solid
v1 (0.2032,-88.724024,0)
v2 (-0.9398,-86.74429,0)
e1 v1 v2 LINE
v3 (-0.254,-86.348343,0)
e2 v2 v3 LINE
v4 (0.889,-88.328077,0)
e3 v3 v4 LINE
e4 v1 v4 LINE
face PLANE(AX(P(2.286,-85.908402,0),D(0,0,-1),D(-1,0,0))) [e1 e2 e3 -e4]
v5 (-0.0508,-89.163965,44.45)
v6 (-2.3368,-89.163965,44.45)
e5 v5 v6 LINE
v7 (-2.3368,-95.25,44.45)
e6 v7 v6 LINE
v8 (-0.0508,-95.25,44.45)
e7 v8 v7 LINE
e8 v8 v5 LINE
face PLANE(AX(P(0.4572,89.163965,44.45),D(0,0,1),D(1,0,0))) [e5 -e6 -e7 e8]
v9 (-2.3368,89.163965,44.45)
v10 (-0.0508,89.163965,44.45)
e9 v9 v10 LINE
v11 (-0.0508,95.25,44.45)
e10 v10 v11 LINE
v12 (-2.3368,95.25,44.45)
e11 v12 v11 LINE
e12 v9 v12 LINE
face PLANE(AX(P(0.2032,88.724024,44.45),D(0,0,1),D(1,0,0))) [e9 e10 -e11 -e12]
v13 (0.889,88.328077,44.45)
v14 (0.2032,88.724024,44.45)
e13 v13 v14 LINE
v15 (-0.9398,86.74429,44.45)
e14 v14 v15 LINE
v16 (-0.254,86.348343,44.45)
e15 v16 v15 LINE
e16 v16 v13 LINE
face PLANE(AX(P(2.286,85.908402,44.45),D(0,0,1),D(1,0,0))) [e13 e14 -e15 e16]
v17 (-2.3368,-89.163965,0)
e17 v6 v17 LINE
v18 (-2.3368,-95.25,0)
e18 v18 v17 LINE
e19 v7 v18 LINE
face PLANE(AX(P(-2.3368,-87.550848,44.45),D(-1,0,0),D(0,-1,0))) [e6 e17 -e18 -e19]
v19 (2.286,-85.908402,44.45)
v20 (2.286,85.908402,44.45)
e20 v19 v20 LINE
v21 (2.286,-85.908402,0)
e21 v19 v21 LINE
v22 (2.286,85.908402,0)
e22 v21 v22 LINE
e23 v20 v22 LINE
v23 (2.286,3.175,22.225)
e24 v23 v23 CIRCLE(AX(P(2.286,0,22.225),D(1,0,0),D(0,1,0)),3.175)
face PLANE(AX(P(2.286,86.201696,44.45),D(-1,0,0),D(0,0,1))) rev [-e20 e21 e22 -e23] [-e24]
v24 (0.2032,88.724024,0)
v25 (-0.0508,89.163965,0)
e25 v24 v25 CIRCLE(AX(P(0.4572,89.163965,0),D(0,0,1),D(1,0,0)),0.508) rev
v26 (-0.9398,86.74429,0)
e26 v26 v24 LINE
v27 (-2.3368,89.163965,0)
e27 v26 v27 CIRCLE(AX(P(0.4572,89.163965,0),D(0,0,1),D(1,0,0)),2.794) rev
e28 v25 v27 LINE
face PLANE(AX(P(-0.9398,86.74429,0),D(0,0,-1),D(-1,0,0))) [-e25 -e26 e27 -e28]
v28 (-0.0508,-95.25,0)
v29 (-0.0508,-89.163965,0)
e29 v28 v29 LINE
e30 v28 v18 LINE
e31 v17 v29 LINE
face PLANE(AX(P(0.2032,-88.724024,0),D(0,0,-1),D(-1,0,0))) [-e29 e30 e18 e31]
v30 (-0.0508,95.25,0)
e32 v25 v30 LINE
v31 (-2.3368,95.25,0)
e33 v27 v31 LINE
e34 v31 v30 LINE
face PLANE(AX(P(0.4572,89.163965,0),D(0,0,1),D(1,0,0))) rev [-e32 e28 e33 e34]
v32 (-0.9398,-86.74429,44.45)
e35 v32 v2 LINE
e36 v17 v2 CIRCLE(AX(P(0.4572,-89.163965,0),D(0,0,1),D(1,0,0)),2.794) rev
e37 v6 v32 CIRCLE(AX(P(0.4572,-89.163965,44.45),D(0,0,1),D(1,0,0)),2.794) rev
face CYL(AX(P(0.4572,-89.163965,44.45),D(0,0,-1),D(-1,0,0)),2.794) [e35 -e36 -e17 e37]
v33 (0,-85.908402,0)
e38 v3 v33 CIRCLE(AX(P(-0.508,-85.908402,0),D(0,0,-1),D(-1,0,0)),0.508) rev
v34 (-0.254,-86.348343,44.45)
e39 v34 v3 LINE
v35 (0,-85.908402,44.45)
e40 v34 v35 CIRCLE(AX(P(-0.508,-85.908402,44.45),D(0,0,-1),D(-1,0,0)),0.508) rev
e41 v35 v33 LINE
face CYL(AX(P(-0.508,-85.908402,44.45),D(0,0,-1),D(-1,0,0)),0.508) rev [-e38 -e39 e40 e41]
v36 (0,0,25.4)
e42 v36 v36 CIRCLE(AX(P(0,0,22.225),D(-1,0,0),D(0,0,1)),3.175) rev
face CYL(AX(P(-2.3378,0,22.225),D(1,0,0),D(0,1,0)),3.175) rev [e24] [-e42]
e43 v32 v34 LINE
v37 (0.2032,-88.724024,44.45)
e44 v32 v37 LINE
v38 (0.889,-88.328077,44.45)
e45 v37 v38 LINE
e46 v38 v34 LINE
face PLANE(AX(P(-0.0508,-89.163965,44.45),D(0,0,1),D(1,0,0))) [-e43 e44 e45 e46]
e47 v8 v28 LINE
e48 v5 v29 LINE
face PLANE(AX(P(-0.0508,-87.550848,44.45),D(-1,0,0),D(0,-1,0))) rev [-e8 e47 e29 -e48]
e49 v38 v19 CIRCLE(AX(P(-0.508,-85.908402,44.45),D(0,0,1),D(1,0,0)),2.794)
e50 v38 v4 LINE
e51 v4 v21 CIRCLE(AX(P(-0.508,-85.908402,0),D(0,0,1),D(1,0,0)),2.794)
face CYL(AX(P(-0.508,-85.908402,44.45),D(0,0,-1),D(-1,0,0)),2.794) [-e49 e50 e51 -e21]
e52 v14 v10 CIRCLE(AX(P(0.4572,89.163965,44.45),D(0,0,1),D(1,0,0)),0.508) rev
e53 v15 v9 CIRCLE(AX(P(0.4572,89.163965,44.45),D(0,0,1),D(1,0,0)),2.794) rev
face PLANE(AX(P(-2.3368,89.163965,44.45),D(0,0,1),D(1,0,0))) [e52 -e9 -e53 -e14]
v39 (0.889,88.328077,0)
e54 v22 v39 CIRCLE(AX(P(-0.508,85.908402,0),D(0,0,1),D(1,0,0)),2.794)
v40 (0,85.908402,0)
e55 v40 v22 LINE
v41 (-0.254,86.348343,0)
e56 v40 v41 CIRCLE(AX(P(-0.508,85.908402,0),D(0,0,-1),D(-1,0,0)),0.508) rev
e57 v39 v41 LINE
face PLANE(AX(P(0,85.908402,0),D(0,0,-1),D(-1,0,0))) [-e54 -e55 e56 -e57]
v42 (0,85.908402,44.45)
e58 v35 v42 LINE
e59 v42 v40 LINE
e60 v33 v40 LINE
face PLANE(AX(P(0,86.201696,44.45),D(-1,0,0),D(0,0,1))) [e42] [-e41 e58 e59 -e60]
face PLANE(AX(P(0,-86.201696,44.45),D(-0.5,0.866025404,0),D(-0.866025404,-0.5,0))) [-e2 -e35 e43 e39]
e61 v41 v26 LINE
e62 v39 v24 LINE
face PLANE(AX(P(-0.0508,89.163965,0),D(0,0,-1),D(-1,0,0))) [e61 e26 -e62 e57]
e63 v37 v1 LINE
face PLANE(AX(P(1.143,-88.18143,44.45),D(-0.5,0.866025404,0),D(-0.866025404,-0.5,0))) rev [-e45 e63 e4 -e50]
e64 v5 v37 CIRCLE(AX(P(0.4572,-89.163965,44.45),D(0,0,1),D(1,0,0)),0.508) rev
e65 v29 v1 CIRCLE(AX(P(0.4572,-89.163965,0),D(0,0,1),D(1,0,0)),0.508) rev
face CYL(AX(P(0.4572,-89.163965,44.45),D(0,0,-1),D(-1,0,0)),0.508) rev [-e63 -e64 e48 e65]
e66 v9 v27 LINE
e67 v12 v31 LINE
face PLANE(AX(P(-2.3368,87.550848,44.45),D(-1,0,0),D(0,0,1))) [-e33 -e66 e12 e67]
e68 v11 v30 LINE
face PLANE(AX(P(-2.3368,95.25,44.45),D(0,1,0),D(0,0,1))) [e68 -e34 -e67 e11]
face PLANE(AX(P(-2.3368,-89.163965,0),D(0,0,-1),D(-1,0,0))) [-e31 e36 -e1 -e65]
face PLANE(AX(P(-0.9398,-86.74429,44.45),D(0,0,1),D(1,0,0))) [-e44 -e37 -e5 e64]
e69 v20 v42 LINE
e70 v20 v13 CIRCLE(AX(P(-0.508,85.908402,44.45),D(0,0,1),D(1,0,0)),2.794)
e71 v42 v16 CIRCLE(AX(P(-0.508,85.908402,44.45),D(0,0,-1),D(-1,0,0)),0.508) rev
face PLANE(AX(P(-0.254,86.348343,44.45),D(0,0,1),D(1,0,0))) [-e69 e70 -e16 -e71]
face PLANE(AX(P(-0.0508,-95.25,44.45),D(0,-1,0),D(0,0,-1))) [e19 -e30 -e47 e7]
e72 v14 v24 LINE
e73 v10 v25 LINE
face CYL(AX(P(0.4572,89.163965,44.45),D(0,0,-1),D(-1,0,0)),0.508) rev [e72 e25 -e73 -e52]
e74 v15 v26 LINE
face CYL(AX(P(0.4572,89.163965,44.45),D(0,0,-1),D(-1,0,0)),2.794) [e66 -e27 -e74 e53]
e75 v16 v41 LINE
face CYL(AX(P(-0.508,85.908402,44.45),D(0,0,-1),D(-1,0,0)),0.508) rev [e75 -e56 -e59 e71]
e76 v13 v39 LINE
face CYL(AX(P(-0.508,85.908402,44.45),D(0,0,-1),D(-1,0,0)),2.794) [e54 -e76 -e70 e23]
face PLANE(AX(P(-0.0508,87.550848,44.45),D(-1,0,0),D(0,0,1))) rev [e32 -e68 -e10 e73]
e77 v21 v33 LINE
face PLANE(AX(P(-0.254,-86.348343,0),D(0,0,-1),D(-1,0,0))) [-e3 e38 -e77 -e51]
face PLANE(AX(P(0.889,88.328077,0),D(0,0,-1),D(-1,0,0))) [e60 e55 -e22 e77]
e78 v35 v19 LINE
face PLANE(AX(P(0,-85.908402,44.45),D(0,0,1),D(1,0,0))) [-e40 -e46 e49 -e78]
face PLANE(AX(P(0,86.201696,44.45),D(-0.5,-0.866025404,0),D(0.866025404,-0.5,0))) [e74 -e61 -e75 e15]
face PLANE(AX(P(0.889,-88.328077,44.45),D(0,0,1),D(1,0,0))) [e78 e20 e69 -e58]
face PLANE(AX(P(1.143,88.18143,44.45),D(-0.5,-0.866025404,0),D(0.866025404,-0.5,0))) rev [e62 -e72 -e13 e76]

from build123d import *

# Parameters (mm, degrees)
BASE_FLANGE1_DEPTH = 44.45
CUT_EXTRUDE3_REACH = 107.213
SKETCH5_R          = 3.175


# Sheet-metal steps are written as plain solids
with BuildPart() as part:
    # Sketch1 → Base-Flange1 (new body)
    with BuildSketch(Plane.XY):
        with BuildLine():
            Line((-2.3368, 95.25), (-2.3368, 89.163964543))
            ThreePointArc((-2.3368, 89.163964543), (-1.962474978, 87.766964543), (-0.9398, 86.744289565))
            Line((-0.9398, 86.744289565), (-0.254, 86.34834275))
            ThreePointArc((-0.254, 86.34834275), (-0.068059095, 86.162401845), (0, 85.908401845))
            Line((0, 85.908401845), (0, -85.908401845))
            ThreePointArc((0, -85.908401845), (-0.068059095, -86.162401845), (-0.254, -86.34834275))
            Line((-0.254, -86.34834275), (-0.9398, -86.744289565))
            ThreePointArc((-0.9398, -86.744289565), (-1.962474978, -87.766964543), (-2.3368, -89.163964543))
            Line((-2.3368, -89.163964543), (-2.3368, -95.25))
            Line((-2.3368, -95.25), (-0.0508, -95.25))
            Line((-0.0508, -95.25), (-0.0508, -89.163964543))
            ThreePointArc((-0.0508, -89.163964543), (0.017259095, -88.909964543), (0.2032, -88.724023638))
            Line((0.2032, -88.724023638), (0.889, -88.328076823))
            ThreePointArc((0.889, -88.328076823), (1.911674978, -87.305401845), (2.286, -85.908401845))
            Line((2.286, -85.908401845), (2.286, 85.908401845))
            ThreePointArc((2.286, 85.908401845), (1.911674978, 87.305401845), (0.889, 88.328076823))
            Line((0.889, 88.328076823), (0.2032, 88.724023638))
            ThreePointArc((0.2032, 88.724023638), (0.017259095, 88.909964543), (-0.0508, 89.163964543))
            Line((-0.0508, 89.163964543), (-0.0508, 95.25))
            Line((-0.0508, 95.25), (-2.3368, 95.25))
        make_face()
    extrude(amount=BASE_FLANGE1_DEPTH)

    # Sketch5 → Cut-Extrude3 (cut, up to next)
    with BuildSketch(Plane(origin=(2.286, 0, 0), x_dir=(0, 0, -1), z_dir=(1, 0, 0)), mode=Mode.PRIVATE) as cut_extrude3_sk1:
        with Locations(Location((-22.225, 0, 0), (0, 0, 90))):
            Circle(SKETCH5_R)
    cut_extrude3_tool1 = extrude(cut_extrude3_sk1.sketch, amount=-CUT_EXTRUDE3_REACH, mode=Mode.PRIVATE) & part.part
    add(cut_extrude3_tool1.solids().sort_by_distance((2.286, 0, 22.225))[0], mode=Mode.SUBTRACT)


solid = part.part
